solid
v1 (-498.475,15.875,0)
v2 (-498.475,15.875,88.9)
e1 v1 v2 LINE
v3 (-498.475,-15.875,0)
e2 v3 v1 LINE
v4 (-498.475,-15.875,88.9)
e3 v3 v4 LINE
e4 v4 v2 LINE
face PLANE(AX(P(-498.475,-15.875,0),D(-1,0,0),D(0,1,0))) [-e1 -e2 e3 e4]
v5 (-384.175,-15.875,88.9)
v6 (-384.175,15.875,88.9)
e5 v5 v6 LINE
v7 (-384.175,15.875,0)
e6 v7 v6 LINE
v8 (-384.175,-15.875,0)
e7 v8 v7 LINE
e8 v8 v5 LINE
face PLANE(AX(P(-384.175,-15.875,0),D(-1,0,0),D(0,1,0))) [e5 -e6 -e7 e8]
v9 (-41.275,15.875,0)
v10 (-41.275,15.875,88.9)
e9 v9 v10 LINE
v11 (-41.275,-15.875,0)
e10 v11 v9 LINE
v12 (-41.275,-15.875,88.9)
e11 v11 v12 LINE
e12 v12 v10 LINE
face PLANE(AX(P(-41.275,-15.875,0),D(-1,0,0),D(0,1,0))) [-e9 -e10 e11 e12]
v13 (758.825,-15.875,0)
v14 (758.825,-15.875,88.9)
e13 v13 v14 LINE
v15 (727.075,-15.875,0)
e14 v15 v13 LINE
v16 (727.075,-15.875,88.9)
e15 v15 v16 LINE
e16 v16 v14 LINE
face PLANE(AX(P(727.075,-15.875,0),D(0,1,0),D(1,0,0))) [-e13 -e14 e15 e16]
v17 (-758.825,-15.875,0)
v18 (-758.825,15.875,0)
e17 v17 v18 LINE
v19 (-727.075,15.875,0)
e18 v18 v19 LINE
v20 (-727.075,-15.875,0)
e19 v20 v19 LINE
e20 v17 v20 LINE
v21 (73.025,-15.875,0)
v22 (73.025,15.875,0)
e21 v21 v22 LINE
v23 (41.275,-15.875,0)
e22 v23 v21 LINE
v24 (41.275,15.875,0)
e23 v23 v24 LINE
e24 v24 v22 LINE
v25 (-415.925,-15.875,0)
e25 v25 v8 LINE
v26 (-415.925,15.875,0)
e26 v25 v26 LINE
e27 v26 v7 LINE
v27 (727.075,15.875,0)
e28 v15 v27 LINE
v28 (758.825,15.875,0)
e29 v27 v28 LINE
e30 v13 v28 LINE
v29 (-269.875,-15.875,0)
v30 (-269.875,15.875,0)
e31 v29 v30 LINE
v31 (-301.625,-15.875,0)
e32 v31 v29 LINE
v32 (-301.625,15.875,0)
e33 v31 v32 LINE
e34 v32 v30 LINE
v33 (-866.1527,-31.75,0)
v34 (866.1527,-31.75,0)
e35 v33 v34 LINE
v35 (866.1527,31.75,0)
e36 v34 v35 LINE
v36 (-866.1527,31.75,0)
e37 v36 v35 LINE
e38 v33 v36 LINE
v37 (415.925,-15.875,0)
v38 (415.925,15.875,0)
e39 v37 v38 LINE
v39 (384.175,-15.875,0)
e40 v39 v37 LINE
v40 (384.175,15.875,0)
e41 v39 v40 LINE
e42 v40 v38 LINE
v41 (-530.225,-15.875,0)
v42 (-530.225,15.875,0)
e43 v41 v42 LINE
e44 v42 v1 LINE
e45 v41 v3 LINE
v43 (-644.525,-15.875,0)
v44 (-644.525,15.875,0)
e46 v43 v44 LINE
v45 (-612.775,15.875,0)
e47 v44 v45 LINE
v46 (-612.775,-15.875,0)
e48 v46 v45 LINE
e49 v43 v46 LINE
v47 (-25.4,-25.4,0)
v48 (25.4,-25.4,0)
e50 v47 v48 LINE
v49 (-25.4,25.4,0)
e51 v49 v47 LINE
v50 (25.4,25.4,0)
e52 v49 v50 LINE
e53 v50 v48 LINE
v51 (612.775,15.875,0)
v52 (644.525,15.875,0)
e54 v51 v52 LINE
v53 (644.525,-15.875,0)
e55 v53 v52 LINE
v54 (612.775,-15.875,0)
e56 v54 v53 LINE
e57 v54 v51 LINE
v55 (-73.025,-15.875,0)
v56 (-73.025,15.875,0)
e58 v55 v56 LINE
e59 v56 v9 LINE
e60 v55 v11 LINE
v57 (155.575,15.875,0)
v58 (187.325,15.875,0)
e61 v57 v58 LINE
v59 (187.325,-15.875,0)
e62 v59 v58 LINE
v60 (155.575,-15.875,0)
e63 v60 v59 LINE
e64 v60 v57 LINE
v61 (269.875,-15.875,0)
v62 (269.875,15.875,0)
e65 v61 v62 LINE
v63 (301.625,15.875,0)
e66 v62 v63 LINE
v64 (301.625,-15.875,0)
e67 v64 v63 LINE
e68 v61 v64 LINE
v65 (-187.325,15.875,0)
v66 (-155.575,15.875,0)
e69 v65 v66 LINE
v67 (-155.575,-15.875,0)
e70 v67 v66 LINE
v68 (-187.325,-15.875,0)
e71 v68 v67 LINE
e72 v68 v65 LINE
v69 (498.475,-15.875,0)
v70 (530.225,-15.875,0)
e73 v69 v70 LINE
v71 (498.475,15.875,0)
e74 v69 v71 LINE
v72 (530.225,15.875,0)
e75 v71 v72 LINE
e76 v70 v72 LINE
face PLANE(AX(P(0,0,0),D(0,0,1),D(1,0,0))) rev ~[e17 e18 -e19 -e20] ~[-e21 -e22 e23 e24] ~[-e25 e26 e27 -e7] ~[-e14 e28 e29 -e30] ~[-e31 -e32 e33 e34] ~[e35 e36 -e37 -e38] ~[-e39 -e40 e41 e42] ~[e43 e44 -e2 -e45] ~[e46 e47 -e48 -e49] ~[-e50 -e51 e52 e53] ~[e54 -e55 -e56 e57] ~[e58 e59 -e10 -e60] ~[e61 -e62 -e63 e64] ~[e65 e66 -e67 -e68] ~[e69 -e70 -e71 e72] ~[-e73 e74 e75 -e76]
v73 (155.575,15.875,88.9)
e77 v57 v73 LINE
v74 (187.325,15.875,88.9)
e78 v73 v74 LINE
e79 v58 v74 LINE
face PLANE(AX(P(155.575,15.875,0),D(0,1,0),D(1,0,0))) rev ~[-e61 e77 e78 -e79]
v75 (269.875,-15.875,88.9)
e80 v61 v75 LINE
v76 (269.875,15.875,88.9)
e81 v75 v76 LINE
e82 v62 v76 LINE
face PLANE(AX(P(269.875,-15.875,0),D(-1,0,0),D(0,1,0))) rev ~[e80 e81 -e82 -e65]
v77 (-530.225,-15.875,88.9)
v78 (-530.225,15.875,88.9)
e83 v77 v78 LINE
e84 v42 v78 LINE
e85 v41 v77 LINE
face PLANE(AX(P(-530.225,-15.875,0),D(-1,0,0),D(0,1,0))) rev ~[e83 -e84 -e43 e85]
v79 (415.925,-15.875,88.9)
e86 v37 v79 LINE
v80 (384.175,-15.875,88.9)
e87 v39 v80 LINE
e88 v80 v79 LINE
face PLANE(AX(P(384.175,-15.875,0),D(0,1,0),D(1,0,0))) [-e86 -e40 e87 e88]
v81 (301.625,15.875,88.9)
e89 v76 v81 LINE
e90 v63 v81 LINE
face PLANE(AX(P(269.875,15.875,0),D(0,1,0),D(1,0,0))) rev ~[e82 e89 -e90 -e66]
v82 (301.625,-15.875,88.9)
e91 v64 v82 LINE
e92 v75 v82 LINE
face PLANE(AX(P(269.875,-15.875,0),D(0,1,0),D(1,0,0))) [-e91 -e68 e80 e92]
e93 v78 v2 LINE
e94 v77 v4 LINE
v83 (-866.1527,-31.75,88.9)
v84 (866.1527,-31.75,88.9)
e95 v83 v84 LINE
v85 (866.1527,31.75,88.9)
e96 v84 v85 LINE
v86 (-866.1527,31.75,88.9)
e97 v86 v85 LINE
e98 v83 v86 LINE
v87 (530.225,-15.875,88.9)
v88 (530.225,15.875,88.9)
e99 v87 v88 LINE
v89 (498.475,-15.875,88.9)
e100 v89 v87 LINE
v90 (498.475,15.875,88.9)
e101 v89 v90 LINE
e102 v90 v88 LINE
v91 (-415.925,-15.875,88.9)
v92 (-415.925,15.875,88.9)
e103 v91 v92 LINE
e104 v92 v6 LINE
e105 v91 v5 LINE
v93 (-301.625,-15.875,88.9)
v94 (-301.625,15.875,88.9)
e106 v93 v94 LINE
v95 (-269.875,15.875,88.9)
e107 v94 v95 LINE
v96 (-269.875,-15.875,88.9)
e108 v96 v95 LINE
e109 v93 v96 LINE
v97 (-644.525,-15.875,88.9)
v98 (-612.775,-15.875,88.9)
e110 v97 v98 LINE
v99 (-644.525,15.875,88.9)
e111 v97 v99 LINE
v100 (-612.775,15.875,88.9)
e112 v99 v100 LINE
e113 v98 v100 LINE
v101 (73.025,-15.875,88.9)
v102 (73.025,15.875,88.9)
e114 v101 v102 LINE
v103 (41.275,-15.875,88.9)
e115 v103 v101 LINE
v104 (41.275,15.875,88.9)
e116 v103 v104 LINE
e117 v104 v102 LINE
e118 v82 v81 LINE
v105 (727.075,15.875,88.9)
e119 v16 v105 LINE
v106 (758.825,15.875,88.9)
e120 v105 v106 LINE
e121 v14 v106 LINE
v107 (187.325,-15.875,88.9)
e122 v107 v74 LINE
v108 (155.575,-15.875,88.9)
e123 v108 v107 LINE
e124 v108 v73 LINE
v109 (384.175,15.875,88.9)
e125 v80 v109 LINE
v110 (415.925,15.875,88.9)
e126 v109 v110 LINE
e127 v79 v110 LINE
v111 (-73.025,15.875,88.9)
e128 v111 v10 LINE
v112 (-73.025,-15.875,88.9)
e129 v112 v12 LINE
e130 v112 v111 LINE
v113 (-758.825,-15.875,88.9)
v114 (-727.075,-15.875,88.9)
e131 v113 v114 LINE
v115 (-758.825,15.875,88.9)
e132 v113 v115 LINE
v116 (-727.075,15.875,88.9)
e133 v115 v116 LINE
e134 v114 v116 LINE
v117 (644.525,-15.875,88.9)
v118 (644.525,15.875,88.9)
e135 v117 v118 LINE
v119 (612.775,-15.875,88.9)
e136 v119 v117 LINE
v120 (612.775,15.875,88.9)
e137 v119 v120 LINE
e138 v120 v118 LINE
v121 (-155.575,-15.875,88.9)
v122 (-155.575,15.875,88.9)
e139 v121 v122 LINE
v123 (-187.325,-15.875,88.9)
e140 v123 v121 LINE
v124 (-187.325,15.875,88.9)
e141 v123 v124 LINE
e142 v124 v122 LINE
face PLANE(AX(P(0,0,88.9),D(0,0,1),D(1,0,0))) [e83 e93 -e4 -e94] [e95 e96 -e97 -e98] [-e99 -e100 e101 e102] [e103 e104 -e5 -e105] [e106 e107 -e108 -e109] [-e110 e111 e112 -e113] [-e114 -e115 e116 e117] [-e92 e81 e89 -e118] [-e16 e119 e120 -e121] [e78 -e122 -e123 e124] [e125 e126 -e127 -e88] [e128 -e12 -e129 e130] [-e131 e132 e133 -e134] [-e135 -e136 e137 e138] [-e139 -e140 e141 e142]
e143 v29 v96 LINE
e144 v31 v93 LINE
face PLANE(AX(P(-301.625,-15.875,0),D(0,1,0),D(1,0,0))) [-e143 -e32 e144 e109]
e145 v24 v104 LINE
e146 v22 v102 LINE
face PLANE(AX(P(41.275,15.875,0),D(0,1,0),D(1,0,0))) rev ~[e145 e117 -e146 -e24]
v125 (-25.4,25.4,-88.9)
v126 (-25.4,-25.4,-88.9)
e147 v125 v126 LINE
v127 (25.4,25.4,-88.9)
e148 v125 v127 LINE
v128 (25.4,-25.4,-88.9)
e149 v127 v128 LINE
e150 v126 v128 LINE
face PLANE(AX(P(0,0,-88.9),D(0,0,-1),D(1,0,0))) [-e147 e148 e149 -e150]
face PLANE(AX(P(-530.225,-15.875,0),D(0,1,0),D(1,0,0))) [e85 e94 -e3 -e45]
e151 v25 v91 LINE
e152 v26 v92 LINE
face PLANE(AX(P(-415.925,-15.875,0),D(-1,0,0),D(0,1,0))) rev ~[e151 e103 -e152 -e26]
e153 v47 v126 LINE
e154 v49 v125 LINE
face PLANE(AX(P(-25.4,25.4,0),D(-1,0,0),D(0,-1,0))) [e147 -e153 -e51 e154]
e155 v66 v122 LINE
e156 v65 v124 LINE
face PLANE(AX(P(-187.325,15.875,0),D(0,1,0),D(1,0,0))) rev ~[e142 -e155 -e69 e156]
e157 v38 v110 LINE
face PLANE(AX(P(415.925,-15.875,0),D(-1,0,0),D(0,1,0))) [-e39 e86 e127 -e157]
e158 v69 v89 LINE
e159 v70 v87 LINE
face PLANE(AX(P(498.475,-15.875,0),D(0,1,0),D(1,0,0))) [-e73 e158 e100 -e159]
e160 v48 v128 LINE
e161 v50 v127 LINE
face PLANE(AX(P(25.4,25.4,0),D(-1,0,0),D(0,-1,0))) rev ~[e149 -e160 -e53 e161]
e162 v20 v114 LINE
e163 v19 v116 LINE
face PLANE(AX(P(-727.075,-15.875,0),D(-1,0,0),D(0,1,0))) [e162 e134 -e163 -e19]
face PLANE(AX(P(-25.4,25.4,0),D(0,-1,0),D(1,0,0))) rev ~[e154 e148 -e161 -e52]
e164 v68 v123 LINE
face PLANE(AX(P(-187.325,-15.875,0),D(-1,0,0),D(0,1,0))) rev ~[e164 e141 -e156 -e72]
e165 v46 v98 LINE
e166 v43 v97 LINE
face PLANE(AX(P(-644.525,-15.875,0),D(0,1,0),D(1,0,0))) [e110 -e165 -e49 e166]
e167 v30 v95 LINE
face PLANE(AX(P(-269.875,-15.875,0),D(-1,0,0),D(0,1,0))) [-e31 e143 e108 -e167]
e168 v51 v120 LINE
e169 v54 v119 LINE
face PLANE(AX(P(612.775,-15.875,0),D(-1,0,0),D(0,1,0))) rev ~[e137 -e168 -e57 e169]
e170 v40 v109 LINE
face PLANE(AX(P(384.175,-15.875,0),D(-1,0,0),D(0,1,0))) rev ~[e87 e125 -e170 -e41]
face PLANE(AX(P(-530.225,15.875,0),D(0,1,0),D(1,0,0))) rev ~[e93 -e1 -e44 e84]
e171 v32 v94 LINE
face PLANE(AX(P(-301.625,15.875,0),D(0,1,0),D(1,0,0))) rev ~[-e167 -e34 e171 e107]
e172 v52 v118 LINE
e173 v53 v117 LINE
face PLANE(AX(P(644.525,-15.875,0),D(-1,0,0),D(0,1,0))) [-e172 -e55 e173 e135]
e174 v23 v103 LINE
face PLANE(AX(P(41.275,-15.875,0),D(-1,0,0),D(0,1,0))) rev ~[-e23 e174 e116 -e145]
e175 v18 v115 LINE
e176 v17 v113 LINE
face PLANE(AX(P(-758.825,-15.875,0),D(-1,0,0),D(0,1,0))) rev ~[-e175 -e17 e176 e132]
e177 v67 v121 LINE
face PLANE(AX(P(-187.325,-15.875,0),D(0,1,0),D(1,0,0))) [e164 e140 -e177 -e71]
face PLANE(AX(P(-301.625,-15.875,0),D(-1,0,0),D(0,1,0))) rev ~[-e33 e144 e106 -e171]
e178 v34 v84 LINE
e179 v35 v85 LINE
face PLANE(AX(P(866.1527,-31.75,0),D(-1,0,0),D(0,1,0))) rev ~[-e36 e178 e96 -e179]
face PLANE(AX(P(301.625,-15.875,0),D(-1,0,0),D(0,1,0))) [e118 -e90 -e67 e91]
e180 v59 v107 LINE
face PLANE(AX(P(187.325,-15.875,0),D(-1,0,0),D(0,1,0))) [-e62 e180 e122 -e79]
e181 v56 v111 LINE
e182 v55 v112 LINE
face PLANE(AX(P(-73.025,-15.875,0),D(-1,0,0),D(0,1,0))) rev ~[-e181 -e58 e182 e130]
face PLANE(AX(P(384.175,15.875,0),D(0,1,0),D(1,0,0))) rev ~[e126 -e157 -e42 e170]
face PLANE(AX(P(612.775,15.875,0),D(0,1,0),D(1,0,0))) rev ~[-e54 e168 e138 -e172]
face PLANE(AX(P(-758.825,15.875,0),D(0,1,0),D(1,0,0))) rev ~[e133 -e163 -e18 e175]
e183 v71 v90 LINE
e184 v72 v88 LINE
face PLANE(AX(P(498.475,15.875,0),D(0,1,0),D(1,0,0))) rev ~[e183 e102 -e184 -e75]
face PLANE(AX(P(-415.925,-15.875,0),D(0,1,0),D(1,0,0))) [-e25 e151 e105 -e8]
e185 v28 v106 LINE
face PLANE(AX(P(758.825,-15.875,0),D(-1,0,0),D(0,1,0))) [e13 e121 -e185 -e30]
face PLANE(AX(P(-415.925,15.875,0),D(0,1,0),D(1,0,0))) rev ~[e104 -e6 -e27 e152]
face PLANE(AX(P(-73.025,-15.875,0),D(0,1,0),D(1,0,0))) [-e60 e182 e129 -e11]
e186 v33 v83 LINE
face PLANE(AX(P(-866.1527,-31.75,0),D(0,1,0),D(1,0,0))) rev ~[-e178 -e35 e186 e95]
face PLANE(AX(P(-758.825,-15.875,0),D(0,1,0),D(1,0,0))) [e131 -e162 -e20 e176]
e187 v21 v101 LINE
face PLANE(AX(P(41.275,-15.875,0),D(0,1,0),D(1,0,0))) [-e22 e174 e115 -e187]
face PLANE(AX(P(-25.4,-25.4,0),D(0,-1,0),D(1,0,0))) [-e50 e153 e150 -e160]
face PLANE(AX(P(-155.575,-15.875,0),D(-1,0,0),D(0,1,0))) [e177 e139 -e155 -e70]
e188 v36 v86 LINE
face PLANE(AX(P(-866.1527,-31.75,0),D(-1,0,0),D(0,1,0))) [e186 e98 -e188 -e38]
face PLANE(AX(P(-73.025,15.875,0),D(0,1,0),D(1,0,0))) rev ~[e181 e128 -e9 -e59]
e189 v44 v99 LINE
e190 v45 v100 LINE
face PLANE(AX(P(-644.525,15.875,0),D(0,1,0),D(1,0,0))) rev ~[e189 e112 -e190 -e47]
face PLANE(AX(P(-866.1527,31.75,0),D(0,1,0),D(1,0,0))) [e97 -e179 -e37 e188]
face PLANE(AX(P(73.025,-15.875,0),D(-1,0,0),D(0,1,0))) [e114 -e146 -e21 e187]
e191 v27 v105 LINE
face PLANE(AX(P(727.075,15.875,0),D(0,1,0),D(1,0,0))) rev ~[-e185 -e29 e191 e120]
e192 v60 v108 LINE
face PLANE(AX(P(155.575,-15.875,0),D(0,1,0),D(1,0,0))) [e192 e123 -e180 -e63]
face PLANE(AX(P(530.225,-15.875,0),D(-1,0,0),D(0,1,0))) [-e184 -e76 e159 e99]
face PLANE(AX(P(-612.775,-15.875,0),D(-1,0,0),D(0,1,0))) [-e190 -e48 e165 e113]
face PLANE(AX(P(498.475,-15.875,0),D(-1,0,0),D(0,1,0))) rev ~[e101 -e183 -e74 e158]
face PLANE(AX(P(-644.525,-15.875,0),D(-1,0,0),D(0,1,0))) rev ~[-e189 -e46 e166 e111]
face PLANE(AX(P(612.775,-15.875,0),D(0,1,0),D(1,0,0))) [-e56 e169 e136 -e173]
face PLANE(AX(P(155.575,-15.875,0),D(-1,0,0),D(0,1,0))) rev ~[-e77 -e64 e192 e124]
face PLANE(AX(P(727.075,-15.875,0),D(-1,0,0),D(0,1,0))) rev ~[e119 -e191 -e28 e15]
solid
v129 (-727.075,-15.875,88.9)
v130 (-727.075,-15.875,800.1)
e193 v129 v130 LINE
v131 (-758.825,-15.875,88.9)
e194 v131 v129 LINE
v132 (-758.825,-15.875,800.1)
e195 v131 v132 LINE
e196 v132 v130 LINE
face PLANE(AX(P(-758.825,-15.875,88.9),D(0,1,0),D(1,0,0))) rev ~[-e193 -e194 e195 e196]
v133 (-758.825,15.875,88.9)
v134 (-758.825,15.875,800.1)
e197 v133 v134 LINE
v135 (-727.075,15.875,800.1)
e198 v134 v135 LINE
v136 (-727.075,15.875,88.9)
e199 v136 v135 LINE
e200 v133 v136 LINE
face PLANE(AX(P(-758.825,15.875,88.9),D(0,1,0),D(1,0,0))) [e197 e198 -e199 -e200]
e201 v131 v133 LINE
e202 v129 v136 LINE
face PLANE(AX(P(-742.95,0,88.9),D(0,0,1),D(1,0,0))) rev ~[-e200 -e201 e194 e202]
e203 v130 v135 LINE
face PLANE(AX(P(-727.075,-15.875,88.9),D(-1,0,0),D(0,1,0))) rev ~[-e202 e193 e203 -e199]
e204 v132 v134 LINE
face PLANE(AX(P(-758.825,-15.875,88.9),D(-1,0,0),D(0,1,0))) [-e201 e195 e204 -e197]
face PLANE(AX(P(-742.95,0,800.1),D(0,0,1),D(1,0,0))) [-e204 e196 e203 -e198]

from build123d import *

# Parameters (mm, degrees)
F0_W     = 1732.3054
F0_H     = 63.5
F0_W_2   = 31.75
F0_H_2   = 31.75
F1_DEPTH = 88.9
F3_W     = 50.8
F3_H     = 50.8
F4_DEPTH = 88.9
F2_W     = 31.75
F2_H     = 31.75
F5_DEPTH = 711.2


with BuildPart() as f1:
    # F0 (on Top) → F1 (new body)
    with BuildSketch(Plane.XY):
        Rectangle(F0_W, F0_H)
        with Locations((-742.95, 0)):
            Rectangle(F0_W_2, F0_H_2, mode=Mode.SUBTRACT)
        with Locations((-628.65, 0)):
            Rectangle(F0_W_2, F0_H_2, mode=Mode.SUBTRACT)
        with Locations((-514.35, 0)):
            Rectangle(F0_W_2, F0_H_2, mode=Mode.SUBTRACT)
        with Locations((-400.05, 0)):
            Rectangle(F0_W_2, F0_H_2, mode=Mode.SUBTRACT)
        with Locations((-285.75, 0)):
            Rectangle(F0_W_2, F0_H_2, mode=Mode.SUBTRACT)
        with Locations((-171.45, 0)):
            Rectangle(F0_W_2, F0_H_2, mode=Mode.SUBTRACT)
        with Locations((-57.15, 0)):
            Rectangle(F0_W_2, F0_H_2, mode=Mode.SUBTRACT)
        with Locations((57.15, 0)):
            Rectangle(F0_W_2, F0_H_2, mode=Mode.SUBTRACT)
        with Locations((171.45, 0)):
            Rectangle(F0_W_2, F0_H_2, mode=Mode.SUBTRACT)
        with Locations((285.75, 0)):
            Rectangle(F0_W_2, F0_H_2, mode=Mode.SUBTRACT)
        with Locations((400.05, 0)):
            Rectangle(F0_W_2, F0_H_2, mode=Mode.SUBTRACT)
        with Locations((514.35, 0)):
            Rectangle(F0_W_2, F0_H_2, mode=Mode.SUBTRACT)
        with Locations((628.65, 0)):
            Rectangle(F0_W_2, F0_H_2, mode=Mode.SUBTRACT)
        with Locations((742.95, 0)):
            Rectangle(F0_W_2, F0_H_2, mode=Mode.SUBTRACT)
    extrude(amount=F1_DEPTH)

    # F3 (on face) → F4 (join)
    with BuildSketch(Plane(origin=(0, 0, 0), x_dir=(1, 0, 0), z_dir=(0, 0, -1))):
        Rectangle(F3_W, F3_H)
    extrude(amount=F4_DEPTH)


with BuildPart() as f5:
    # F2 (on face) → F5 (new body)
    with BuildSketch(Plane.XY.offset(88.9)):
        with Locations((-742.95, 0)):
            Rectangle(F2_W, F2_H)
    extrude(amount=F5_DEPTH)


solid = Compound([f1.part, f5.part])
